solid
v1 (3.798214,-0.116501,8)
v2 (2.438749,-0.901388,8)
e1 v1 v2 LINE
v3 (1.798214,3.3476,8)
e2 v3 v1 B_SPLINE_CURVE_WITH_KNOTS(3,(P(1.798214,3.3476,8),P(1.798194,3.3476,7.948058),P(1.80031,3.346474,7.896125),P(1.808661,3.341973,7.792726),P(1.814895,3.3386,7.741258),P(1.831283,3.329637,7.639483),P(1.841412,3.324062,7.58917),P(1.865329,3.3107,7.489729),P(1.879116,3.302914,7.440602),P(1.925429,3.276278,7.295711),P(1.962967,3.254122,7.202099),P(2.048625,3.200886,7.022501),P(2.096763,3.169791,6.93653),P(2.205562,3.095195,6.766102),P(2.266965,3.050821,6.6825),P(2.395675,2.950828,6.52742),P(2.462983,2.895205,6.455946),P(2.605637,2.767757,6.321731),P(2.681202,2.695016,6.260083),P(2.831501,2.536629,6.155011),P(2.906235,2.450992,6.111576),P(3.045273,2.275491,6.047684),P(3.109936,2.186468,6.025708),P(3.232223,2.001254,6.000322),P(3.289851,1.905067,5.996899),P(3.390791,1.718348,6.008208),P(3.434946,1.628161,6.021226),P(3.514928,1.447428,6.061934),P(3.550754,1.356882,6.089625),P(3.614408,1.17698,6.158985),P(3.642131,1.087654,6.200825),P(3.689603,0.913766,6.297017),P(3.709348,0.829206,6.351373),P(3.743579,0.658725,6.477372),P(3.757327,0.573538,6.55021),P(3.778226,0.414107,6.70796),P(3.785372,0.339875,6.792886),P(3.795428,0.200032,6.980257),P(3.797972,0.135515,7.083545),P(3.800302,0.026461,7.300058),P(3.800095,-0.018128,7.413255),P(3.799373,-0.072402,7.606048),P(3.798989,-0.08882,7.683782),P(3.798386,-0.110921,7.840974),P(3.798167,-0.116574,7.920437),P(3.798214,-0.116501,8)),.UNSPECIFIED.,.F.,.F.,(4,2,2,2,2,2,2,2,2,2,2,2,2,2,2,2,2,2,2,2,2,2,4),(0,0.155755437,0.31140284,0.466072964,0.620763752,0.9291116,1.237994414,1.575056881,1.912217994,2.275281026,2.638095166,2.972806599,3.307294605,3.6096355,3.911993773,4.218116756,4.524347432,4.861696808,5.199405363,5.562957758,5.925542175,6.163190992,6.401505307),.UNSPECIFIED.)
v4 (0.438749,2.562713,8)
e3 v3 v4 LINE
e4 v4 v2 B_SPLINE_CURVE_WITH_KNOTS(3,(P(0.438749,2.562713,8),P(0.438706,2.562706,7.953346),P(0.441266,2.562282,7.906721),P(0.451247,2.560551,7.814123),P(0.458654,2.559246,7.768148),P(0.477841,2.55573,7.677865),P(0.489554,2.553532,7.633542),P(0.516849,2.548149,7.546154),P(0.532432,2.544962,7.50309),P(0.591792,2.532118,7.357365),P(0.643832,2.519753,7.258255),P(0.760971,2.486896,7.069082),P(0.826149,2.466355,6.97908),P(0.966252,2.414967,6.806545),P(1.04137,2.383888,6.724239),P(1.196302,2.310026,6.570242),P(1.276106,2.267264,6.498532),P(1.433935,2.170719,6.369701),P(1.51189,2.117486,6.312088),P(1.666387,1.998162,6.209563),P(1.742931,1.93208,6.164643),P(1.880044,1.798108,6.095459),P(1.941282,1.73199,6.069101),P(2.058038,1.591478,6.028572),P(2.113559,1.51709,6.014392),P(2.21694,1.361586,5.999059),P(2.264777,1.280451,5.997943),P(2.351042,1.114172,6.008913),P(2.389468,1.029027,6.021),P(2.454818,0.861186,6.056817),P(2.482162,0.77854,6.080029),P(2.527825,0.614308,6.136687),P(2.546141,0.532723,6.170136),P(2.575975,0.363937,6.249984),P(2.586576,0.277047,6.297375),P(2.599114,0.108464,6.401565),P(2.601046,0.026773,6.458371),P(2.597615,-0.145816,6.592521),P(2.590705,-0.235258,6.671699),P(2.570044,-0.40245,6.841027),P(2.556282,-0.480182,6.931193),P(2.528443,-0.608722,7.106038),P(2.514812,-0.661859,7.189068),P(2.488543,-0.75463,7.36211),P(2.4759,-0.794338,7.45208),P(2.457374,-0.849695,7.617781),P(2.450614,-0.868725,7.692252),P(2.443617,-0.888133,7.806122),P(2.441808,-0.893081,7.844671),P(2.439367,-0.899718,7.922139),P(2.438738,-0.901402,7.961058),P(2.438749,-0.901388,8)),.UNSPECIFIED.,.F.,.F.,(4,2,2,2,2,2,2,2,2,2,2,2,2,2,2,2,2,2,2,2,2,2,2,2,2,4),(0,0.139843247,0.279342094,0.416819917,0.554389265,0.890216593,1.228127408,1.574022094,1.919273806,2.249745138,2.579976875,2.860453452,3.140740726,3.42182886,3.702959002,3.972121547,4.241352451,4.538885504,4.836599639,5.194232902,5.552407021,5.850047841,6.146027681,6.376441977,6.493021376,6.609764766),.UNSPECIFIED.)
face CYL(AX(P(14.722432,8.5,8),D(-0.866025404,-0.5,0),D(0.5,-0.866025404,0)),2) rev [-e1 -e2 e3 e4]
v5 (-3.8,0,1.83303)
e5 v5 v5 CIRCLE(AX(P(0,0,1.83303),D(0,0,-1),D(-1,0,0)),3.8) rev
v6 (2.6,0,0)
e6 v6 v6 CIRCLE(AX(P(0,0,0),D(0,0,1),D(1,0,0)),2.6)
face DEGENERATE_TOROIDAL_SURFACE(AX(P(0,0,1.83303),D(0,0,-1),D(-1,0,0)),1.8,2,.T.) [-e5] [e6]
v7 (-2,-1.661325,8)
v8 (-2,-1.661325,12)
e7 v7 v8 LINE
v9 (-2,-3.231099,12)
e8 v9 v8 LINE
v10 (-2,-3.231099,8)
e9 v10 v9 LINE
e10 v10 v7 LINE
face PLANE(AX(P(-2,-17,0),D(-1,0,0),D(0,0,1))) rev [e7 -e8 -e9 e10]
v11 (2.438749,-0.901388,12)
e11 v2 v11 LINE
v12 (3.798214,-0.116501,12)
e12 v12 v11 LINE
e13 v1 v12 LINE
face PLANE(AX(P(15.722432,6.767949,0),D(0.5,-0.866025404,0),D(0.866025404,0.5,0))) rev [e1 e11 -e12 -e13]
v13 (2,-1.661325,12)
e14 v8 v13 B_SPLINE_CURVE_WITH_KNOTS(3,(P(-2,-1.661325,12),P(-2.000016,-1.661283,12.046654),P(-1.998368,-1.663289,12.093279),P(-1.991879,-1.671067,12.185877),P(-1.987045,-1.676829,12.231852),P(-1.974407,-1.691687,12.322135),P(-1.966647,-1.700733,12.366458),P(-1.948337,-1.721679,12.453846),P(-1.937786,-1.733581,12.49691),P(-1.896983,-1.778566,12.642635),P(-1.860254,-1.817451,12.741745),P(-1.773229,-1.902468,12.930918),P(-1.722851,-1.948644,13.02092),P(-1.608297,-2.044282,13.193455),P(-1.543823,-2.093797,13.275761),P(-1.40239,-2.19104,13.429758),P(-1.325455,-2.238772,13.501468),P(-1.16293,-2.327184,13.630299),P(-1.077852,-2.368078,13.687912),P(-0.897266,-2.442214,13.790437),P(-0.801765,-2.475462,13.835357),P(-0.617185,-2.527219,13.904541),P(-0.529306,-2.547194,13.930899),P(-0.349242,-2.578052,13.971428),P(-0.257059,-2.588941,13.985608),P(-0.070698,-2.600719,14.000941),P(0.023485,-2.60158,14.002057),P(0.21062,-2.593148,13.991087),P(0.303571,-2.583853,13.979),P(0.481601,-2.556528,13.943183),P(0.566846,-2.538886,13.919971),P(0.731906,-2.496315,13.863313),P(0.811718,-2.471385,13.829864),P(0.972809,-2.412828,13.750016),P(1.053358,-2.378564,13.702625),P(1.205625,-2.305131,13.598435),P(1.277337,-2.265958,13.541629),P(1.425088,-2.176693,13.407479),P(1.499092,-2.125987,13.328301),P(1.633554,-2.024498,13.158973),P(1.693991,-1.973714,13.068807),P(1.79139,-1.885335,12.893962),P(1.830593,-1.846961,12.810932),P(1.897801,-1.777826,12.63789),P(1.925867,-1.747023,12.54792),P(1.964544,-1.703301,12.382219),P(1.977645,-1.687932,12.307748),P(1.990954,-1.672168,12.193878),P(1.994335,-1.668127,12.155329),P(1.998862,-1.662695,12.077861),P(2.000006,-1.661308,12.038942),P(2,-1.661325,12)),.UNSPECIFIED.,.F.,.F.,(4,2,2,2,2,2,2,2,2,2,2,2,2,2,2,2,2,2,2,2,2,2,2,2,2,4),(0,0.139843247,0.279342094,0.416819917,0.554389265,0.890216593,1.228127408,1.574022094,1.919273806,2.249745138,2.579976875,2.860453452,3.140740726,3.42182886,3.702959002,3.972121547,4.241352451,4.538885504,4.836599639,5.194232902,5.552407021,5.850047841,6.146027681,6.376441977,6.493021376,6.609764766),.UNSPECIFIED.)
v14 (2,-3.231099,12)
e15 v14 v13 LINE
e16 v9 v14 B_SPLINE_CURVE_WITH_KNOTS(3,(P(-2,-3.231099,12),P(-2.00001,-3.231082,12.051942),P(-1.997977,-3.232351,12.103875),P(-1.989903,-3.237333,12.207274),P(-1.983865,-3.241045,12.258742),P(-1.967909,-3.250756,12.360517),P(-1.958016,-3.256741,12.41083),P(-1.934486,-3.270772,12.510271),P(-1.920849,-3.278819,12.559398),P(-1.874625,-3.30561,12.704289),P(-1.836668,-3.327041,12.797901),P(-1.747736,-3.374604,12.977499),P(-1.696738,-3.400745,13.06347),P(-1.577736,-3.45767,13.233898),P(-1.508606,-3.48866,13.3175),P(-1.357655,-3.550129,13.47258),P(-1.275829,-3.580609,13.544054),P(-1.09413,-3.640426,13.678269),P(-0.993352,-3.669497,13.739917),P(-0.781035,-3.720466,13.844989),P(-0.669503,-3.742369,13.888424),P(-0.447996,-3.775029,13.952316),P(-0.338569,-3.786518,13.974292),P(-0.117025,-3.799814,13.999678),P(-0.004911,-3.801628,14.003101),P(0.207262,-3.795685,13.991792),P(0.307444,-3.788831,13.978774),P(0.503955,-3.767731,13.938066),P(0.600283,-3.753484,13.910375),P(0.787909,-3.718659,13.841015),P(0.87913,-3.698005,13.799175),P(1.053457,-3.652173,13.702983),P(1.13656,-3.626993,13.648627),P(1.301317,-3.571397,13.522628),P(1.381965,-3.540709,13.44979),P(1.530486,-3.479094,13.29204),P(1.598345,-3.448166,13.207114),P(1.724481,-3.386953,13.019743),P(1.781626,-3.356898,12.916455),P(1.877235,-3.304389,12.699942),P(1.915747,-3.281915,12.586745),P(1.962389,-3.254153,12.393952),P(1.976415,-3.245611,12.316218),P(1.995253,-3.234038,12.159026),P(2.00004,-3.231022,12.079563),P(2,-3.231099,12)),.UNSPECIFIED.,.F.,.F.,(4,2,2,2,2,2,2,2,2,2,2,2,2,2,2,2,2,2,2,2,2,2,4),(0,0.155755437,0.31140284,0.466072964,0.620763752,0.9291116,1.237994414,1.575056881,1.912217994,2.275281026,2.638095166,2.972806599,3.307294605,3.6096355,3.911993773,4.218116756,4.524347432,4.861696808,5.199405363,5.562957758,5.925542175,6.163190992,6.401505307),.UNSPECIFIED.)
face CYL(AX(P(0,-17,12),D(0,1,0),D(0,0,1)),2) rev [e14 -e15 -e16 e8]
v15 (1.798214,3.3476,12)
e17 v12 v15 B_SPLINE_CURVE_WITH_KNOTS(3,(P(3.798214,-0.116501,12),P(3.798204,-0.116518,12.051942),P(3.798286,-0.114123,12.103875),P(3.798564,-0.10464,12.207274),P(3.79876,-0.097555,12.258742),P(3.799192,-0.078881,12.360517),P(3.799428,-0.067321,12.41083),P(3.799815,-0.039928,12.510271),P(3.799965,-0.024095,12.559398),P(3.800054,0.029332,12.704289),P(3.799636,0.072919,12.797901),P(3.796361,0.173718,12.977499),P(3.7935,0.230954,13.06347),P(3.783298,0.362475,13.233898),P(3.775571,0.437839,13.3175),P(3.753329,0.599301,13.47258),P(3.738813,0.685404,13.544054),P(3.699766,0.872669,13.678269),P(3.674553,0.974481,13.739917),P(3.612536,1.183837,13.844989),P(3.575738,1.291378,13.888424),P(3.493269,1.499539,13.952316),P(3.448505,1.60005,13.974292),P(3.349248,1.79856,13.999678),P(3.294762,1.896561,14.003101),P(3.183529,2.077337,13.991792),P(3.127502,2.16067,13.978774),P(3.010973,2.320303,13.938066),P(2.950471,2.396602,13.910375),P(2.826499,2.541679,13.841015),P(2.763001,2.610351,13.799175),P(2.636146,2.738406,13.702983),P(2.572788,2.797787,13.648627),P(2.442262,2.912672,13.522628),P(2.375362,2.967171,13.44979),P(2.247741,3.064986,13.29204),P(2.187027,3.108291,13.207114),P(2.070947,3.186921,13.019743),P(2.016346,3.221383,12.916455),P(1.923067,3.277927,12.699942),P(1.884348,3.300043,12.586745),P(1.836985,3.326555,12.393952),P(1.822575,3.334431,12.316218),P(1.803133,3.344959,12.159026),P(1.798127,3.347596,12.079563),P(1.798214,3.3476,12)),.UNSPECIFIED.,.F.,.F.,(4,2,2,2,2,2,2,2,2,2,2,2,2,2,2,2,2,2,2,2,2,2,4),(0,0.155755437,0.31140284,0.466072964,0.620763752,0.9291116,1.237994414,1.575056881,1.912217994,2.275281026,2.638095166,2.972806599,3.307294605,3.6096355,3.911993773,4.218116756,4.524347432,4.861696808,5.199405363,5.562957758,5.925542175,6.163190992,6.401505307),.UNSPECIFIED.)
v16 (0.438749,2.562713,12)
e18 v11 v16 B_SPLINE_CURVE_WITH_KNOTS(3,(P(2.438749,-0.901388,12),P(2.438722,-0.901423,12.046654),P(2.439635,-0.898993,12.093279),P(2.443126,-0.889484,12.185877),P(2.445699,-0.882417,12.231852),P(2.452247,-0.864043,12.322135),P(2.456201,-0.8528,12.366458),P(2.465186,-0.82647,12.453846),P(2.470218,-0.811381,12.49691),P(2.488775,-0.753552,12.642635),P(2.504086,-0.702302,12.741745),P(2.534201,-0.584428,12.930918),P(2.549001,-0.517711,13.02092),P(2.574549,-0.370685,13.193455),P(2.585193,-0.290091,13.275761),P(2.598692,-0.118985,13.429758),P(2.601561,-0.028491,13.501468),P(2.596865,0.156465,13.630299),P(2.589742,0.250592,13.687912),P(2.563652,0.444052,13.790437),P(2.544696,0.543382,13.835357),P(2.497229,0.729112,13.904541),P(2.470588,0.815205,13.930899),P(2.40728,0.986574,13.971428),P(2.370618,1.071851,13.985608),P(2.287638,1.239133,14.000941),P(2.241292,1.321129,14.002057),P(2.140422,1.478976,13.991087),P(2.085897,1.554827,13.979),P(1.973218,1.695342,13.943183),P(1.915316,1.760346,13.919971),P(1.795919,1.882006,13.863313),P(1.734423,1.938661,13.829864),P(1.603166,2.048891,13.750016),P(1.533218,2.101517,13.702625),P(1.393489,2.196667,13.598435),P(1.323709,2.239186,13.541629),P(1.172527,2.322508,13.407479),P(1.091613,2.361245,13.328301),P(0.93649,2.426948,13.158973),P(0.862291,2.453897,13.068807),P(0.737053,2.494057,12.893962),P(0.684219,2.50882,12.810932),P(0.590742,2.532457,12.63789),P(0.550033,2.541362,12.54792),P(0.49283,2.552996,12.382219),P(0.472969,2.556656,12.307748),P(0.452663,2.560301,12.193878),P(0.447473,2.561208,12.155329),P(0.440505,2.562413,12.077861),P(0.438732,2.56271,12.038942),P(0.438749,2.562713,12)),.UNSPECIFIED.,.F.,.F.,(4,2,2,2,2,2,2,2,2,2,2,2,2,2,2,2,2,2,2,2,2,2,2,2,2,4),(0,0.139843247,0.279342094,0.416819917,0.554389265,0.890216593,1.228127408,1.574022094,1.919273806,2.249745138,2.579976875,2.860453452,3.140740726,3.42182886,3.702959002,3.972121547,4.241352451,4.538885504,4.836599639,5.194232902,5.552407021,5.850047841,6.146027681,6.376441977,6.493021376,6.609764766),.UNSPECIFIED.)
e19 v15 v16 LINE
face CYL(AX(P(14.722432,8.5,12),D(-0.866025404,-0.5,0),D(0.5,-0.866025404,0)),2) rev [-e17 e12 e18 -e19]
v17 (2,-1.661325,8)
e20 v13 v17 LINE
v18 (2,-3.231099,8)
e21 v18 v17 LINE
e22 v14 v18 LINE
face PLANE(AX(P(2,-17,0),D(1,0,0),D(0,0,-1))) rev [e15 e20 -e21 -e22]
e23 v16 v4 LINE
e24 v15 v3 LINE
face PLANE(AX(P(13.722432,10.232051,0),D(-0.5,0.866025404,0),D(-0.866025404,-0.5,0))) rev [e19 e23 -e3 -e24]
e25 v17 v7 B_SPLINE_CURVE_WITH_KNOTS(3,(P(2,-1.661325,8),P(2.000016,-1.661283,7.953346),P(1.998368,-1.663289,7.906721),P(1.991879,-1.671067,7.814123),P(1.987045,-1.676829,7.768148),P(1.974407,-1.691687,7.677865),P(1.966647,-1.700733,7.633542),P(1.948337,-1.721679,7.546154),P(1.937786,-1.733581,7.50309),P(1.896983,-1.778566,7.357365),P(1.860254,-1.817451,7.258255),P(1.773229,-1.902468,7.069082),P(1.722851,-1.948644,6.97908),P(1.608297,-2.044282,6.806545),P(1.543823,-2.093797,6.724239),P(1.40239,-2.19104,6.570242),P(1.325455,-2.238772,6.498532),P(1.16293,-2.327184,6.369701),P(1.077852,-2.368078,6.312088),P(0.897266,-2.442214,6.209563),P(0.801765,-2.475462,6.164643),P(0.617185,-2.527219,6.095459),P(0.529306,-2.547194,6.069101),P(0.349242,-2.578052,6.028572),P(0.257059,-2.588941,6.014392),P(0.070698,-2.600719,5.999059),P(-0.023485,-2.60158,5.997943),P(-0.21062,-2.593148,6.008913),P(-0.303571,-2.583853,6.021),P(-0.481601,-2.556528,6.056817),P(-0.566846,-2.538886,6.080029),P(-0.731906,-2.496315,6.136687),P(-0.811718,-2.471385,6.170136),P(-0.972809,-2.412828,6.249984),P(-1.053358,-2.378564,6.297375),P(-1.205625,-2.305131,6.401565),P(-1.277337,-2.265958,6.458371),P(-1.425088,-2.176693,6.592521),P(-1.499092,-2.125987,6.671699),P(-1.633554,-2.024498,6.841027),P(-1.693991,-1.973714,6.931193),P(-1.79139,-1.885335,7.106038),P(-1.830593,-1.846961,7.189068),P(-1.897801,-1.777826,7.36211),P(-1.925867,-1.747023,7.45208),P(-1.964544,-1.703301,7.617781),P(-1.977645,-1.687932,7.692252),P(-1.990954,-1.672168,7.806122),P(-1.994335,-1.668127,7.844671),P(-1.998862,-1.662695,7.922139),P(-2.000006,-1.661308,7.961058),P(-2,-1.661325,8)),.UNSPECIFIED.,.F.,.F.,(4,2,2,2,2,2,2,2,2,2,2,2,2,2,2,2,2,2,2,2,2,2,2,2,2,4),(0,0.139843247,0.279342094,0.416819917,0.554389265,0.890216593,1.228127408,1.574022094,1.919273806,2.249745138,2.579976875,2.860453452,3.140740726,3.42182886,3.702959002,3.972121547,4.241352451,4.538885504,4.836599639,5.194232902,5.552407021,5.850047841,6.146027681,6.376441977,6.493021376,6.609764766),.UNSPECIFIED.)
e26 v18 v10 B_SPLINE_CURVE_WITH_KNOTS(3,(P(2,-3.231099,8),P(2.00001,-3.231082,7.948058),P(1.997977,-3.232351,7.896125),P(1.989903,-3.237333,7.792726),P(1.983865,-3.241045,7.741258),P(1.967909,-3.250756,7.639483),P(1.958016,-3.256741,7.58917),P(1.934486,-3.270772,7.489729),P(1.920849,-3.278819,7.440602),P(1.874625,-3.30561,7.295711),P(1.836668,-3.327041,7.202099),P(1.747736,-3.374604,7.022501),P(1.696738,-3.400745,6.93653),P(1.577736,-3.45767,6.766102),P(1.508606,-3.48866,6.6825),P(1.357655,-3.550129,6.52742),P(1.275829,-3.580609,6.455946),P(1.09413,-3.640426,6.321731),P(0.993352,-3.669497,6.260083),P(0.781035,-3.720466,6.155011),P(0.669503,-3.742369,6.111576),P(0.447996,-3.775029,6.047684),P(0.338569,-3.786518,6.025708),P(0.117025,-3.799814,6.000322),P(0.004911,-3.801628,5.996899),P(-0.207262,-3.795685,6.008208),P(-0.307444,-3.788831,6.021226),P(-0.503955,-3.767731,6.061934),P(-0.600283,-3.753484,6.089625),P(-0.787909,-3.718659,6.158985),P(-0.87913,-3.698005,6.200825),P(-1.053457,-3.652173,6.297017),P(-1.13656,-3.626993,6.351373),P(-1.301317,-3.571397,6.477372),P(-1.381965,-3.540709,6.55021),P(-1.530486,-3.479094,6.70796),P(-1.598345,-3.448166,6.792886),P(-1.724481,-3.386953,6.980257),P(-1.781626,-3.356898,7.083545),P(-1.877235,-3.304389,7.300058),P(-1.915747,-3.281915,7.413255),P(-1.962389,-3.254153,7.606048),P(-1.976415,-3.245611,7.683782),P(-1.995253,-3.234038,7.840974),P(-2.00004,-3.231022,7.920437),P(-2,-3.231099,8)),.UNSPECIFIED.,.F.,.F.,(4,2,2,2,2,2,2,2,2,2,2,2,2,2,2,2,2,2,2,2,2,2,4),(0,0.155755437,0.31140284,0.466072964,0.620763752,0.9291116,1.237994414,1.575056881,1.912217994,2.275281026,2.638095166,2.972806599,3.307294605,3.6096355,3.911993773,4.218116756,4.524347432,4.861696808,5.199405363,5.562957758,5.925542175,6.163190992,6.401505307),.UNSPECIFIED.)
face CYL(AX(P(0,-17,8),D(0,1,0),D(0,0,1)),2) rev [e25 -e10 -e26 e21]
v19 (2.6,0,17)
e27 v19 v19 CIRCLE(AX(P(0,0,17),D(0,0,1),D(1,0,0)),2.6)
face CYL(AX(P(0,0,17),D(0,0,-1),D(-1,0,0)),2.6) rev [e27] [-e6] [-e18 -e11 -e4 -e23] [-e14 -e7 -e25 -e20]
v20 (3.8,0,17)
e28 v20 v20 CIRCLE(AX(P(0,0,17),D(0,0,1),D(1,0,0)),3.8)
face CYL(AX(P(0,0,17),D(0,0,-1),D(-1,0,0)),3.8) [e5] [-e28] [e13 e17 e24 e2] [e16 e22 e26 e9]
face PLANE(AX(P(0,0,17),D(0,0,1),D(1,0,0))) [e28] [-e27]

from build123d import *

# Parameters (mm, degrees)
SKETCH_1_R               = 3.8
SKETCH_1_R_2             = 2.6
EXTRUDE_1_DEPTH          = 17
CUT_EXTRUDE_1_DEPTH      = 17
PATTERN_CIRCULAR_1_COUNT = 2
PATTERN_CIRCULAR_1_ANGLE = 120
FILLET_1_R               = 2


with BuildPart() as part:
    # 스케치1 → 보스-돌출1 (new body)
    with BuildSketch(Plane.XY):
        Circle(SKETCH_1_R)
        Circle(SKETCH_1_R_2, mode=Mode.SUBTRACT)
    extrude(amount=EXTRUDE_1_DEPTH)

    # 스케치2 → 컷-돌출1 (cut)
    with BuildSketch(Plane(origin=(0, 0, 0), x_dir=(1, 0, 0), z_dir=(0, 1, 0))):
        with BuildLine():
            Line((-2, -8), (-2, -12))
            ThreePointArc((-2, -12), (0, -14), (2, -12))
            Line((2, -12), (2, -8))
            ThreePointArc((2, -8), (0, -6), (-2, -8))
        make_face()
    cut_extrude_1 = extrude(amount=-CUT_EXTRUDE_1_DEPTH, mode=Mode.SUBTRACT)

    # 원형 패턴1: 컷-돌출1 ×2 about axis
    pattern_circular_1_axis = Axis((0, 0, 0), (0, 0, 1))
    for i in range(1, PATTERN_CIRCULAR_1_COUNT):
        add(cut_extrude_1.rotate(pattern_circular_1_axis, i * PATTERN_CIRCULAR_1_ANGLE / (PATTERN_CIRCULAR_1_COUNT - 1)), mode=Mode.SUBTRACT)

    # 필렛1
    # the kernel refuses this fillet: 2 mm, written as the material it takes off along each edge
    with BuildSketch(Plane(origin=(0, 0, 0), x_dir=(1, 0, 0), z_dir=(0, -1, 0))) as fillet_1_piece_1:
        with BuildLine():
            CenterArc((1.8, 1.833030278), FILLET_1_R, 293.578178478, 66.421821522)
            Line((2.6, 0), (2.616, -0.036660606))
            ThreePointArc((2.616, -0.036660606), (3.2, -0.04), (3.8, -0.04))
            Line((3.8, -0.04), (3.84, 0))
            Line((3.84, 0), (3.84, 1.833030278))
            Line((3.84, 1.833030278), (3.8, 1.833030278))
        make_face()
    revolve(axis=Axis((0, 0, 0), (0, 0, 1)), mode=Mode.SUBTRACT)


solid = part.part
